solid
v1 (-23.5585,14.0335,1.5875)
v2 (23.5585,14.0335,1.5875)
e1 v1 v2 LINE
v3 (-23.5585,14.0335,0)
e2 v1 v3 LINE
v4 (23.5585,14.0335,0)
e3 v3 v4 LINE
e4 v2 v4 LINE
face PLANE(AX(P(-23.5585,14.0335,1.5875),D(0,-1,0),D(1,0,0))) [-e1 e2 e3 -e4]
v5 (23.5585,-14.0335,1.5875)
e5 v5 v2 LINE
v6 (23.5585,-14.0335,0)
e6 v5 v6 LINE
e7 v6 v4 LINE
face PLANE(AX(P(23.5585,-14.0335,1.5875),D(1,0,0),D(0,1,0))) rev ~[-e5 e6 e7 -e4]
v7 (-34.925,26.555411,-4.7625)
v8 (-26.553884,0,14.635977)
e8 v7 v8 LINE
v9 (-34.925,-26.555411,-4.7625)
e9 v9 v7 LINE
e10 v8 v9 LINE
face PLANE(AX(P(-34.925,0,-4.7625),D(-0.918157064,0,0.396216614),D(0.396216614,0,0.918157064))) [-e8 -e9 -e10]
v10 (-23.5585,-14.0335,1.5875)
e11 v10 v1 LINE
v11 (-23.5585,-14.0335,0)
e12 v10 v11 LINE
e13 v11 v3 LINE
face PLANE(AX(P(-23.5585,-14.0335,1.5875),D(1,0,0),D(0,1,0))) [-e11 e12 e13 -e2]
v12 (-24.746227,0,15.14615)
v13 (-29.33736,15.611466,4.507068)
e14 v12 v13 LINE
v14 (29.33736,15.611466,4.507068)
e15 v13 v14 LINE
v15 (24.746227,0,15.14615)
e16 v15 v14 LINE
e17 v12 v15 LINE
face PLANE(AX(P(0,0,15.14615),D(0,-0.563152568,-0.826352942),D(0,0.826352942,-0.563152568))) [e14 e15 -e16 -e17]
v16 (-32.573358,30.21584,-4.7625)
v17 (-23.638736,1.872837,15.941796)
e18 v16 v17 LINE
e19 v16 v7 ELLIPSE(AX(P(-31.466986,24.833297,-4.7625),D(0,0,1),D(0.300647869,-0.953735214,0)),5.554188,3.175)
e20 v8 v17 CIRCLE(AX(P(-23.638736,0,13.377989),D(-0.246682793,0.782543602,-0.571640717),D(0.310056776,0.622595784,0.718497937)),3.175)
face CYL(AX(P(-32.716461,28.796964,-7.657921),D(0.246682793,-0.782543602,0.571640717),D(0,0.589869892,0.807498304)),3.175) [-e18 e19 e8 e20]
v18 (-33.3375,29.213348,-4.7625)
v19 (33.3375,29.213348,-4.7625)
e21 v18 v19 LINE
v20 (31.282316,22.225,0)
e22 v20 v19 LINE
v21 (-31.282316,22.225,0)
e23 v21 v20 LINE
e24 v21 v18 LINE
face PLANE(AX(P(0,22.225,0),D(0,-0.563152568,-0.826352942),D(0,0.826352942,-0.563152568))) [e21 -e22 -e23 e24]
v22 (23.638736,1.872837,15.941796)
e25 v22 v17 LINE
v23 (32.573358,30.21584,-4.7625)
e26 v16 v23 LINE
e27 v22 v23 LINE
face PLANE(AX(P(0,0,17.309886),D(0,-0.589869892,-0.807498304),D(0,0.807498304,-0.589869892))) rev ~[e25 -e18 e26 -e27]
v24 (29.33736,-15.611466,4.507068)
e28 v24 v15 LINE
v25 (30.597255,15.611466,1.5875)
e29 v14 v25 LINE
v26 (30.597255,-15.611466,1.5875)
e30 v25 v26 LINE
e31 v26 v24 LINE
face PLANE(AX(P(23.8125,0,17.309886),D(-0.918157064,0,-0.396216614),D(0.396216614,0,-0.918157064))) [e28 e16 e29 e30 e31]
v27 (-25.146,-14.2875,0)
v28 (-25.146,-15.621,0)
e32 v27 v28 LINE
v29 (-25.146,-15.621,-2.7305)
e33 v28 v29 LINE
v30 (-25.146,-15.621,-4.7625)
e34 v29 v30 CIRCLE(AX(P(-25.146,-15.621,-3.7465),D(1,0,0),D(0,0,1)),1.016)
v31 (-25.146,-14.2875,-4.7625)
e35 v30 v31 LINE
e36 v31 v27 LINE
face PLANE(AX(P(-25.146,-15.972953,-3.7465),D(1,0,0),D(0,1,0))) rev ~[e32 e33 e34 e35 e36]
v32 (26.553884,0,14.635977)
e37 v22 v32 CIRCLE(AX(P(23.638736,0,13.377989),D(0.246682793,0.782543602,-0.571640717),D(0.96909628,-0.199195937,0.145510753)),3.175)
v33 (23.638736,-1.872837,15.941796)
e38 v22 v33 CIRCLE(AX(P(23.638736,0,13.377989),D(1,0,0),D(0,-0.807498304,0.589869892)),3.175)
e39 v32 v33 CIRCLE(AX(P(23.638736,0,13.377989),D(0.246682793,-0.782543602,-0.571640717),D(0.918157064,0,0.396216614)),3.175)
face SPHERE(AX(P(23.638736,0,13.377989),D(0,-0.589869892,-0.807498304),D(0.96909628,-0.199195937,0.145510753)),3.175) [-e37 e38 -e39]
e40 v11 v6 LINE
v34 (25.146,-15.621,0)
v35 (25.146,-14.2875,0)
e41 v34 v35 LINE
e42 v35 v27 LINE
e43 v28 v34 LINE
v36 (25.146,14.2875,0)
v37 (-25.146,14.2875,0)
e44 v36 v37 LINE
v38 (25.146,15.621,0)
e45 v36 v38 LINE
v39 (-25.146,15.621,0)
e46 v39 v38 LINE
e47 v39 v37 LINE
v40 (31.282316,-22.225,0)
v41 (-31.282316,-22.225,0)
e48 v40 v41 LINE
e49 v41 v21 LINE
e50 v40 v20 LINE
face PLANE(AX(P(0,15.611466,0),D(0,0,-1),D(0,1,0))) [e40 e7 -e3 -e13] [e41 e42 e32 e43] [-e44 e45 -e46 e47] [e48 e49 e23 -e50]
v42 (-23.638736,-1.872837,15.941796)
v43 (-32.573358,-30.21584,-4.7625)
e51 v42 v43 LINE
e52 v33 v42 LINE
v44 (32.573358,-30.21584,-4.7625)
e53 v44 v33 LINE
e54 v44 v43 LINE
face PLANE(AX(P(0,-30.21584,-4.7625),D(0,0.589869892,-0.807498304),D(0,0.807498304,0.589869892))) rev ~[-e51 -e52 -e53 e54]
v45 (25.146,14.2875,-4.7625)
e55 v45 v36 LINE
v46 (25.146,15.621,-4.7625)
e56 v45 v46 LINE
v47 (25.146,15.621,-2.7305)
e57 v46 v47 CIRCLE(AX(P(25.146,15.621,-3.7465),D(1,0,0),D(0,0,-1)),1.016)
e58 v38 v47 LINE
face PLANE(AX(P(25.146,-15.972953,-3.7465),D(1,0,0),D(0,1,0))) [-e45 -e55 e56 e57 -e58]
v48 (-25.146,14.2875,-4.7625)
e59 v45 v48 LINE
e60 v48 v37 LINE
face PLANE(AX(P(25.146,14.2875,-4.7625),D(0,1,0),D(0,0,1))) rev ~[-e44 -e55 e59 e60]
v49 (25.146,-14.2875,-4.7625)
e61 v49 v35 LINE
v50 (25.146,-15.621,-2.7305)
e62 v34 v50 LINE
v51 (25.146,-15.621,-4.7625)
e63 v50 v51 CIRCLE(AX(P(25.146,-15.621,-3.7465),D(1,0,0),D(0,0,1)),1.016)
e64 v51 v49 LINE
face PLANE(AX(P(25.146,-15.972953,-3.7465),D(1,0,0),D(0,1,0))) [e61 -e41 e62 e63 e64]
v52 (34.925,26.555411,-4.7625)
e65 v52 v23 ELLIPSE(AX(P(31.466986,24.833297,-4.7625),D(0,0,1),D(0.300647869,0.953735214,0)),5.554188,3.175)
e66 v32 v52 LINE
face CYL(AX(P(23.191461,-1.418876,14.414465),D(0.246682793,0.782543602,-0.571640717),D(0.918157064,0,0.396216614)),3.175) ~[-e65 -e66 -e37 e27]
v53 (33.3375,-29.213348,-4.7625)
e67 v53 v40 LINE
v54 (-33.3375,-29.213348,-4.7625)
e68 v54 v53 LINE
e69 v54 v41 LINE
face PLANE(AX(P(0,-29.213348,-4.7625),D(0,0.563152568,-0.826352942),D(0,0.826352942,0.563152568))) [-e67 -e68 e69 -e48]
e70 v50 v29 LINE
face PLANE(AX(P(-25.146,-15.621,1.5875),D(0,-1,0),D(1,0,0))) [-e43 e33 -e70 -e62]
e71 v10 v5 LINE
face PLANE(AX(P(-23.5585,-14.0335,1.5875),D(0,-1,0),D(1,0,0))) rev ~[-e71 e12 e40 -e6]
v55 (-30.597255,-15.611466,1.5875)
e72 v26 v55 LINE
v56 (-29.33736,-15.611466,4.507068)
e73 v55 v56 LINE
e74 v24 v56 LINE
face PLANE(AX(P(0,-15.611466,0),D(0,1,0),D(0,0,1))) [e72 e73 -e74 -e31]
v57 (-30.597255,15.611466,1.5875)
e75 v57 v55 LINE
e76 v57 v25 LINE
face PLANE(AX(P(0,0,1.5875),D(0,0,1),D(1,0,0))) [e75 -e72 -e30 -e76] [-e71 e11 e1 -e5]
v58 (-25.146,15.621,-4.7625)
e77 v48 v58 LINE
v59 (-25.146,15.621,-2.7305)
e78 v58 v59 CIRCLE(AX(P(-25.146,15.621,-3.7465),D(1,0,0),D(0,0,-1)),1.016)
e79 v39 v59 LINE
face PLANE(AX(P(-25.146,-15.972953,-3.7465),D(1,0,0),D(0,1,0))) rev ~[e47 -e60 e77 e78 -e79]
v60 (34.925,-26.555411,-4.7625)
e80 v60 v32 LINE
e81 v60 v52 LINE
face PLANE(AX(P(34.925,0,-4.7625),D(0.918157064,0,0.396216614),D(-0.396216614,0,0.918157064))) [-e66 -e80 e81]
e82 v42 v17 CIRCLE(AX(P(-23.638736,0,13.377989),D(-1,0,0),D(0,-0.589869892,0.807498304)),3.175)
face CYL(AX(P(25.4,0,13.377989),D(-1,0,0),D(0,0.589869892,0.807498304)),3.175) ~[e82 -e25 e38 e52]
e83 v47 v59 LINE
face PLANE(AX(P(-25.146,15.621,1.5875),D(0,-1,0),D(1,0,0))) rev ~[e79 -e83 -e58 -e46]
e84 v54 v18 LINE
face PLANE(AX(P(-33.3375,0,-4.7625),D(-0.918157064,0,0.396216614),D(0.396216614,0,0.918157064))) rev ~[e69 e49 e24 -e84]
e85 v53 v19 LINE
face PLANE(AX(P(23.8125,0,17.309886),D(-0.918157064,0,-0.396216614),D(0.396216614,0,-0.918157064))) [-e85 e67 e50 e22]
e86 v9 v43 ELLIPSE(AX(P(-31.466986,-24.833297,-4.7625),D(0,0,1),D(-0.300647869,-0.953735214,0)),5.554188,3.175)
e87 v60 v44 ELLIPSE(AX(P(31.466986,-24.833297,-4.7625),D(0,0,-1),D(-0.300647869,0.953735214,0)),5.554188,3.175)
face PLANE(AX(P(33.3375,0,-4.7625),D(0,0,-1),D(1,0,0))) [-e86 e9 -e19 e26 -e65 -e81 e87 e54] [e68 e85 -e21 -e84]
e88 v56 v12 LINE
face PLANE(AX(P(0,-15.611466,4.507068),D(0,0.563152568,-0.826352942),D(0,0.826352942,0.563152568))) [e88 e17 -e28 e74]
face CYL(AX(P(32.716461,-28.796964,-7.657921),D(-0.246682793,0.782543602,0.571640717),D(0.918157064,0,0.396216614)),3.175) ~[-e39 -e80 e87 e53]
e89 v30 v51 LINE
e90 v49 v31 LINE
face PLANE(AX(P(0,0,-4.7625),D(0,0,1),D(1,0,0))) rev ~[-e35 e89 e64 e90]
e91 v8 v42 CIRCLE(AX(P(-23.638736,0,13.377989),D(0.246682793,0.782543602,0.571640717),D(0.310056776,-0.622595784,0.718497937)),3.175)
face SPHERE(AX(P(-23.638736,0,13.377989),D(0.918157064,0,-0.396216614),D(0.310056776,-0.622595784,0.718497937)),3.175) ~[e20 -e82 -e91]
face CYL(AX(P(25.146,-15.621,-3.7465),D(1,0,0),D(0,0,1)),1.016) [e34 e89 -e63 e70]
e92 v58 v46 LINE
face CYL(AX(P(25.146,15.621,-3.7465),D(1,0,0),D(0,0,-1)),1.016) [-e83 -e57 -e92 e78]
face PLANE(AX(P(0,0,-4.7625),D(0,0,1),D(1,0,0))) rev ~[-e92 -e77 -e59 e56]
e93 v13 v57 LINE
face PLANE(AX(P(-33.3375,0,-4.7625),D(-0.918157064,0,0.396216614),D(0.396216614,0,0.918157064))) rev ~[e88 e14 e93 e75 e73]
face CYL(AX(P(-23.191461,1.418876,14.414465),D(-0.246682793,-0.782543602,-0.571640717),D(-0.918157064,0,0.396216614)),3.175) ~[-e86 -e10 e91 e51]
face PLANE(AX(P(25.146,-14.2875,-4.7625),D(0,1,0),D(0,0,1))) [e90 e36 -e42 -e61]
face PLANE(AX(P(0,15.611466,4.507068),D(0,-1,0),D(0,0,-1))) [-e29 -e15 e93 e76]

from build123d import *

# Parameters (mm, degrees)
F0_W      = 63.5
F0_H      = 44.45
F0_W_2    = 50.292
F0_H_2    = 31.242
F1_DEPTH  = 1.5875
F2_W      = 50.292
F2_H      = 31.242
F2_W_2    = 47.117
F2_H_2    = 28.067
F3_DEPTH  = 6.35
F5_DEPTH  = 34.925
F7_DEPTH  = 38.1
F9_DEPTH  = 38.1
F11_DEPTH = 38.1
F12_R     = 3.175
F14_DEPTH = 50.292
F15_W     = 28.575
F15_H     = 4.7625
F16_DEPTH = 50.292


with BuildPart() as f1:
    # F0 (on Top) → F1 (new body)
    with BuildSketch(Plane.XY):
        Rectangle(F0_W, F0_H)
        Rectangle(F0_W_2, F0_H_2, mode=Mode.SUBTRACT)
    extrude(amount=F1_DEPTH)

    # F2 (on face) → F3 (join)
    with BuildSketch(Plane.XY.offset(1.5875)):
        Rectangle(F2_W, F2_H)
        Rectangle(F2_W_2, F2_H_2, mode=Mode.SUBTRACT)
    extrude(amount=-F3_DEPTH)

    # F4 (on Right) → F5 (join, symmetric)
    with BuildSketch(Plane.YZ):
        Polygon((-15.6114658074, 4.507067833), (0, 15.1461502537), (15.6114658074, 4.507067833), (15.6114658074, 0), (22.225, 0), (29.2133475819, -4.7625), (32.3883475819, -4.7625), (0, 17.3098860042), (-32.3883475819, -4.7625), (-29.2133475819, -4.7625), (-22.225, 0), (-15.6114658074, 0), align=None)
    extrude(amount=F5_DEPTH, both=True)

    # F6 (on Front) → F7 (cut, symmetric)
    with BuildSketch(Plane.XZ):
        Polygon((-34.925, -4.7625), (-25.4, 17.3098860042), (-34.925, 17.3098860042), align=None)
        Polygon((34.925, -4.7625), (34.925, 17.3098860042), (25.4, 17.3098860042), align=None)
    extrude(amount=F7_DEPTH, both=True, mode=Mode.SUBTRACT)

    # F8 (on Front) → F9 (join, symmetric)
    with BuildSketch(Plane.XZ):
        Polygon((-23.8125, 17.3098860042), (-25.4, 17.3098860042), (-34.925, -4.7625), (-33.3375, -4.7625), align=None)
        Polygon((34.925, -4.7625), (25.4, 17.3098860042), (23.8125, 17.3098860042), (33.3375, -4.7625), align=None)
    extrude(amount=F9_DEPTH, both=True)

    # F10 (on Right) → F11 (cut, symmetric)
    with BuildSketch(Plane.YZ):
        Polygon((-30.21584, -4.7625), (0, 17.3098860042), (-38.1, 17.3098860042), (-38.1, -4.7625), align=None)
        Polygon((38.1, 17.3098860042), (0, 17.3098860042), (30.21584, -4.7625), (38.1, -4.7625), align=None)
    extrude(amount=F11_DEPTH, both=True, mode=Mode.SUBTRACT)

    # F12
    f12_edges = [f1.edges().sort_by_distance(p)[0] for p in [
        (30.1625, -15.10792, 6.273693),
        (30.1625, 15.10792, 6.273693),
        (0, 0, 17.309886),
        (-30.1625, -15.10792, 6.273693),
        (-30.1625, 15.10792, 6.273693),
    ]]
    fillet(f12_edges, radius=F12_R)

    # F13 (on face) → F14 (join, through all)
    with BuildSketch(Plane.YZ.offset(25.146)):
        with BuildLine():
            Line((-15.621, -4.7625), (-15.621, -2.7305))
            ThreePointArc((-15.621, -2.7305), (-16.637, -3.7465), (-15.621, -4.7625))
        make_face()
        with BuildLine():
            ThreePointArc((15.621, -4.7625), (16.637, -3.7465), (15.621, -2.7305))
            Line((15.621, -2.7305), (15.621, -4.7625))
        make_face()
    extrude(amount=-F14_DEPTH)

    # F15 (on face) → F16 (cut, through all)
    with BuildSketch(Plane.YZ.offset(25.146)):
        with Locations((0, -2.38125)):
            Rectangle(F15_W, F15_H)
    extrude(amount=-F16_DEPTH, mode=Mode.SUBTRACT)


solid = f1.part
